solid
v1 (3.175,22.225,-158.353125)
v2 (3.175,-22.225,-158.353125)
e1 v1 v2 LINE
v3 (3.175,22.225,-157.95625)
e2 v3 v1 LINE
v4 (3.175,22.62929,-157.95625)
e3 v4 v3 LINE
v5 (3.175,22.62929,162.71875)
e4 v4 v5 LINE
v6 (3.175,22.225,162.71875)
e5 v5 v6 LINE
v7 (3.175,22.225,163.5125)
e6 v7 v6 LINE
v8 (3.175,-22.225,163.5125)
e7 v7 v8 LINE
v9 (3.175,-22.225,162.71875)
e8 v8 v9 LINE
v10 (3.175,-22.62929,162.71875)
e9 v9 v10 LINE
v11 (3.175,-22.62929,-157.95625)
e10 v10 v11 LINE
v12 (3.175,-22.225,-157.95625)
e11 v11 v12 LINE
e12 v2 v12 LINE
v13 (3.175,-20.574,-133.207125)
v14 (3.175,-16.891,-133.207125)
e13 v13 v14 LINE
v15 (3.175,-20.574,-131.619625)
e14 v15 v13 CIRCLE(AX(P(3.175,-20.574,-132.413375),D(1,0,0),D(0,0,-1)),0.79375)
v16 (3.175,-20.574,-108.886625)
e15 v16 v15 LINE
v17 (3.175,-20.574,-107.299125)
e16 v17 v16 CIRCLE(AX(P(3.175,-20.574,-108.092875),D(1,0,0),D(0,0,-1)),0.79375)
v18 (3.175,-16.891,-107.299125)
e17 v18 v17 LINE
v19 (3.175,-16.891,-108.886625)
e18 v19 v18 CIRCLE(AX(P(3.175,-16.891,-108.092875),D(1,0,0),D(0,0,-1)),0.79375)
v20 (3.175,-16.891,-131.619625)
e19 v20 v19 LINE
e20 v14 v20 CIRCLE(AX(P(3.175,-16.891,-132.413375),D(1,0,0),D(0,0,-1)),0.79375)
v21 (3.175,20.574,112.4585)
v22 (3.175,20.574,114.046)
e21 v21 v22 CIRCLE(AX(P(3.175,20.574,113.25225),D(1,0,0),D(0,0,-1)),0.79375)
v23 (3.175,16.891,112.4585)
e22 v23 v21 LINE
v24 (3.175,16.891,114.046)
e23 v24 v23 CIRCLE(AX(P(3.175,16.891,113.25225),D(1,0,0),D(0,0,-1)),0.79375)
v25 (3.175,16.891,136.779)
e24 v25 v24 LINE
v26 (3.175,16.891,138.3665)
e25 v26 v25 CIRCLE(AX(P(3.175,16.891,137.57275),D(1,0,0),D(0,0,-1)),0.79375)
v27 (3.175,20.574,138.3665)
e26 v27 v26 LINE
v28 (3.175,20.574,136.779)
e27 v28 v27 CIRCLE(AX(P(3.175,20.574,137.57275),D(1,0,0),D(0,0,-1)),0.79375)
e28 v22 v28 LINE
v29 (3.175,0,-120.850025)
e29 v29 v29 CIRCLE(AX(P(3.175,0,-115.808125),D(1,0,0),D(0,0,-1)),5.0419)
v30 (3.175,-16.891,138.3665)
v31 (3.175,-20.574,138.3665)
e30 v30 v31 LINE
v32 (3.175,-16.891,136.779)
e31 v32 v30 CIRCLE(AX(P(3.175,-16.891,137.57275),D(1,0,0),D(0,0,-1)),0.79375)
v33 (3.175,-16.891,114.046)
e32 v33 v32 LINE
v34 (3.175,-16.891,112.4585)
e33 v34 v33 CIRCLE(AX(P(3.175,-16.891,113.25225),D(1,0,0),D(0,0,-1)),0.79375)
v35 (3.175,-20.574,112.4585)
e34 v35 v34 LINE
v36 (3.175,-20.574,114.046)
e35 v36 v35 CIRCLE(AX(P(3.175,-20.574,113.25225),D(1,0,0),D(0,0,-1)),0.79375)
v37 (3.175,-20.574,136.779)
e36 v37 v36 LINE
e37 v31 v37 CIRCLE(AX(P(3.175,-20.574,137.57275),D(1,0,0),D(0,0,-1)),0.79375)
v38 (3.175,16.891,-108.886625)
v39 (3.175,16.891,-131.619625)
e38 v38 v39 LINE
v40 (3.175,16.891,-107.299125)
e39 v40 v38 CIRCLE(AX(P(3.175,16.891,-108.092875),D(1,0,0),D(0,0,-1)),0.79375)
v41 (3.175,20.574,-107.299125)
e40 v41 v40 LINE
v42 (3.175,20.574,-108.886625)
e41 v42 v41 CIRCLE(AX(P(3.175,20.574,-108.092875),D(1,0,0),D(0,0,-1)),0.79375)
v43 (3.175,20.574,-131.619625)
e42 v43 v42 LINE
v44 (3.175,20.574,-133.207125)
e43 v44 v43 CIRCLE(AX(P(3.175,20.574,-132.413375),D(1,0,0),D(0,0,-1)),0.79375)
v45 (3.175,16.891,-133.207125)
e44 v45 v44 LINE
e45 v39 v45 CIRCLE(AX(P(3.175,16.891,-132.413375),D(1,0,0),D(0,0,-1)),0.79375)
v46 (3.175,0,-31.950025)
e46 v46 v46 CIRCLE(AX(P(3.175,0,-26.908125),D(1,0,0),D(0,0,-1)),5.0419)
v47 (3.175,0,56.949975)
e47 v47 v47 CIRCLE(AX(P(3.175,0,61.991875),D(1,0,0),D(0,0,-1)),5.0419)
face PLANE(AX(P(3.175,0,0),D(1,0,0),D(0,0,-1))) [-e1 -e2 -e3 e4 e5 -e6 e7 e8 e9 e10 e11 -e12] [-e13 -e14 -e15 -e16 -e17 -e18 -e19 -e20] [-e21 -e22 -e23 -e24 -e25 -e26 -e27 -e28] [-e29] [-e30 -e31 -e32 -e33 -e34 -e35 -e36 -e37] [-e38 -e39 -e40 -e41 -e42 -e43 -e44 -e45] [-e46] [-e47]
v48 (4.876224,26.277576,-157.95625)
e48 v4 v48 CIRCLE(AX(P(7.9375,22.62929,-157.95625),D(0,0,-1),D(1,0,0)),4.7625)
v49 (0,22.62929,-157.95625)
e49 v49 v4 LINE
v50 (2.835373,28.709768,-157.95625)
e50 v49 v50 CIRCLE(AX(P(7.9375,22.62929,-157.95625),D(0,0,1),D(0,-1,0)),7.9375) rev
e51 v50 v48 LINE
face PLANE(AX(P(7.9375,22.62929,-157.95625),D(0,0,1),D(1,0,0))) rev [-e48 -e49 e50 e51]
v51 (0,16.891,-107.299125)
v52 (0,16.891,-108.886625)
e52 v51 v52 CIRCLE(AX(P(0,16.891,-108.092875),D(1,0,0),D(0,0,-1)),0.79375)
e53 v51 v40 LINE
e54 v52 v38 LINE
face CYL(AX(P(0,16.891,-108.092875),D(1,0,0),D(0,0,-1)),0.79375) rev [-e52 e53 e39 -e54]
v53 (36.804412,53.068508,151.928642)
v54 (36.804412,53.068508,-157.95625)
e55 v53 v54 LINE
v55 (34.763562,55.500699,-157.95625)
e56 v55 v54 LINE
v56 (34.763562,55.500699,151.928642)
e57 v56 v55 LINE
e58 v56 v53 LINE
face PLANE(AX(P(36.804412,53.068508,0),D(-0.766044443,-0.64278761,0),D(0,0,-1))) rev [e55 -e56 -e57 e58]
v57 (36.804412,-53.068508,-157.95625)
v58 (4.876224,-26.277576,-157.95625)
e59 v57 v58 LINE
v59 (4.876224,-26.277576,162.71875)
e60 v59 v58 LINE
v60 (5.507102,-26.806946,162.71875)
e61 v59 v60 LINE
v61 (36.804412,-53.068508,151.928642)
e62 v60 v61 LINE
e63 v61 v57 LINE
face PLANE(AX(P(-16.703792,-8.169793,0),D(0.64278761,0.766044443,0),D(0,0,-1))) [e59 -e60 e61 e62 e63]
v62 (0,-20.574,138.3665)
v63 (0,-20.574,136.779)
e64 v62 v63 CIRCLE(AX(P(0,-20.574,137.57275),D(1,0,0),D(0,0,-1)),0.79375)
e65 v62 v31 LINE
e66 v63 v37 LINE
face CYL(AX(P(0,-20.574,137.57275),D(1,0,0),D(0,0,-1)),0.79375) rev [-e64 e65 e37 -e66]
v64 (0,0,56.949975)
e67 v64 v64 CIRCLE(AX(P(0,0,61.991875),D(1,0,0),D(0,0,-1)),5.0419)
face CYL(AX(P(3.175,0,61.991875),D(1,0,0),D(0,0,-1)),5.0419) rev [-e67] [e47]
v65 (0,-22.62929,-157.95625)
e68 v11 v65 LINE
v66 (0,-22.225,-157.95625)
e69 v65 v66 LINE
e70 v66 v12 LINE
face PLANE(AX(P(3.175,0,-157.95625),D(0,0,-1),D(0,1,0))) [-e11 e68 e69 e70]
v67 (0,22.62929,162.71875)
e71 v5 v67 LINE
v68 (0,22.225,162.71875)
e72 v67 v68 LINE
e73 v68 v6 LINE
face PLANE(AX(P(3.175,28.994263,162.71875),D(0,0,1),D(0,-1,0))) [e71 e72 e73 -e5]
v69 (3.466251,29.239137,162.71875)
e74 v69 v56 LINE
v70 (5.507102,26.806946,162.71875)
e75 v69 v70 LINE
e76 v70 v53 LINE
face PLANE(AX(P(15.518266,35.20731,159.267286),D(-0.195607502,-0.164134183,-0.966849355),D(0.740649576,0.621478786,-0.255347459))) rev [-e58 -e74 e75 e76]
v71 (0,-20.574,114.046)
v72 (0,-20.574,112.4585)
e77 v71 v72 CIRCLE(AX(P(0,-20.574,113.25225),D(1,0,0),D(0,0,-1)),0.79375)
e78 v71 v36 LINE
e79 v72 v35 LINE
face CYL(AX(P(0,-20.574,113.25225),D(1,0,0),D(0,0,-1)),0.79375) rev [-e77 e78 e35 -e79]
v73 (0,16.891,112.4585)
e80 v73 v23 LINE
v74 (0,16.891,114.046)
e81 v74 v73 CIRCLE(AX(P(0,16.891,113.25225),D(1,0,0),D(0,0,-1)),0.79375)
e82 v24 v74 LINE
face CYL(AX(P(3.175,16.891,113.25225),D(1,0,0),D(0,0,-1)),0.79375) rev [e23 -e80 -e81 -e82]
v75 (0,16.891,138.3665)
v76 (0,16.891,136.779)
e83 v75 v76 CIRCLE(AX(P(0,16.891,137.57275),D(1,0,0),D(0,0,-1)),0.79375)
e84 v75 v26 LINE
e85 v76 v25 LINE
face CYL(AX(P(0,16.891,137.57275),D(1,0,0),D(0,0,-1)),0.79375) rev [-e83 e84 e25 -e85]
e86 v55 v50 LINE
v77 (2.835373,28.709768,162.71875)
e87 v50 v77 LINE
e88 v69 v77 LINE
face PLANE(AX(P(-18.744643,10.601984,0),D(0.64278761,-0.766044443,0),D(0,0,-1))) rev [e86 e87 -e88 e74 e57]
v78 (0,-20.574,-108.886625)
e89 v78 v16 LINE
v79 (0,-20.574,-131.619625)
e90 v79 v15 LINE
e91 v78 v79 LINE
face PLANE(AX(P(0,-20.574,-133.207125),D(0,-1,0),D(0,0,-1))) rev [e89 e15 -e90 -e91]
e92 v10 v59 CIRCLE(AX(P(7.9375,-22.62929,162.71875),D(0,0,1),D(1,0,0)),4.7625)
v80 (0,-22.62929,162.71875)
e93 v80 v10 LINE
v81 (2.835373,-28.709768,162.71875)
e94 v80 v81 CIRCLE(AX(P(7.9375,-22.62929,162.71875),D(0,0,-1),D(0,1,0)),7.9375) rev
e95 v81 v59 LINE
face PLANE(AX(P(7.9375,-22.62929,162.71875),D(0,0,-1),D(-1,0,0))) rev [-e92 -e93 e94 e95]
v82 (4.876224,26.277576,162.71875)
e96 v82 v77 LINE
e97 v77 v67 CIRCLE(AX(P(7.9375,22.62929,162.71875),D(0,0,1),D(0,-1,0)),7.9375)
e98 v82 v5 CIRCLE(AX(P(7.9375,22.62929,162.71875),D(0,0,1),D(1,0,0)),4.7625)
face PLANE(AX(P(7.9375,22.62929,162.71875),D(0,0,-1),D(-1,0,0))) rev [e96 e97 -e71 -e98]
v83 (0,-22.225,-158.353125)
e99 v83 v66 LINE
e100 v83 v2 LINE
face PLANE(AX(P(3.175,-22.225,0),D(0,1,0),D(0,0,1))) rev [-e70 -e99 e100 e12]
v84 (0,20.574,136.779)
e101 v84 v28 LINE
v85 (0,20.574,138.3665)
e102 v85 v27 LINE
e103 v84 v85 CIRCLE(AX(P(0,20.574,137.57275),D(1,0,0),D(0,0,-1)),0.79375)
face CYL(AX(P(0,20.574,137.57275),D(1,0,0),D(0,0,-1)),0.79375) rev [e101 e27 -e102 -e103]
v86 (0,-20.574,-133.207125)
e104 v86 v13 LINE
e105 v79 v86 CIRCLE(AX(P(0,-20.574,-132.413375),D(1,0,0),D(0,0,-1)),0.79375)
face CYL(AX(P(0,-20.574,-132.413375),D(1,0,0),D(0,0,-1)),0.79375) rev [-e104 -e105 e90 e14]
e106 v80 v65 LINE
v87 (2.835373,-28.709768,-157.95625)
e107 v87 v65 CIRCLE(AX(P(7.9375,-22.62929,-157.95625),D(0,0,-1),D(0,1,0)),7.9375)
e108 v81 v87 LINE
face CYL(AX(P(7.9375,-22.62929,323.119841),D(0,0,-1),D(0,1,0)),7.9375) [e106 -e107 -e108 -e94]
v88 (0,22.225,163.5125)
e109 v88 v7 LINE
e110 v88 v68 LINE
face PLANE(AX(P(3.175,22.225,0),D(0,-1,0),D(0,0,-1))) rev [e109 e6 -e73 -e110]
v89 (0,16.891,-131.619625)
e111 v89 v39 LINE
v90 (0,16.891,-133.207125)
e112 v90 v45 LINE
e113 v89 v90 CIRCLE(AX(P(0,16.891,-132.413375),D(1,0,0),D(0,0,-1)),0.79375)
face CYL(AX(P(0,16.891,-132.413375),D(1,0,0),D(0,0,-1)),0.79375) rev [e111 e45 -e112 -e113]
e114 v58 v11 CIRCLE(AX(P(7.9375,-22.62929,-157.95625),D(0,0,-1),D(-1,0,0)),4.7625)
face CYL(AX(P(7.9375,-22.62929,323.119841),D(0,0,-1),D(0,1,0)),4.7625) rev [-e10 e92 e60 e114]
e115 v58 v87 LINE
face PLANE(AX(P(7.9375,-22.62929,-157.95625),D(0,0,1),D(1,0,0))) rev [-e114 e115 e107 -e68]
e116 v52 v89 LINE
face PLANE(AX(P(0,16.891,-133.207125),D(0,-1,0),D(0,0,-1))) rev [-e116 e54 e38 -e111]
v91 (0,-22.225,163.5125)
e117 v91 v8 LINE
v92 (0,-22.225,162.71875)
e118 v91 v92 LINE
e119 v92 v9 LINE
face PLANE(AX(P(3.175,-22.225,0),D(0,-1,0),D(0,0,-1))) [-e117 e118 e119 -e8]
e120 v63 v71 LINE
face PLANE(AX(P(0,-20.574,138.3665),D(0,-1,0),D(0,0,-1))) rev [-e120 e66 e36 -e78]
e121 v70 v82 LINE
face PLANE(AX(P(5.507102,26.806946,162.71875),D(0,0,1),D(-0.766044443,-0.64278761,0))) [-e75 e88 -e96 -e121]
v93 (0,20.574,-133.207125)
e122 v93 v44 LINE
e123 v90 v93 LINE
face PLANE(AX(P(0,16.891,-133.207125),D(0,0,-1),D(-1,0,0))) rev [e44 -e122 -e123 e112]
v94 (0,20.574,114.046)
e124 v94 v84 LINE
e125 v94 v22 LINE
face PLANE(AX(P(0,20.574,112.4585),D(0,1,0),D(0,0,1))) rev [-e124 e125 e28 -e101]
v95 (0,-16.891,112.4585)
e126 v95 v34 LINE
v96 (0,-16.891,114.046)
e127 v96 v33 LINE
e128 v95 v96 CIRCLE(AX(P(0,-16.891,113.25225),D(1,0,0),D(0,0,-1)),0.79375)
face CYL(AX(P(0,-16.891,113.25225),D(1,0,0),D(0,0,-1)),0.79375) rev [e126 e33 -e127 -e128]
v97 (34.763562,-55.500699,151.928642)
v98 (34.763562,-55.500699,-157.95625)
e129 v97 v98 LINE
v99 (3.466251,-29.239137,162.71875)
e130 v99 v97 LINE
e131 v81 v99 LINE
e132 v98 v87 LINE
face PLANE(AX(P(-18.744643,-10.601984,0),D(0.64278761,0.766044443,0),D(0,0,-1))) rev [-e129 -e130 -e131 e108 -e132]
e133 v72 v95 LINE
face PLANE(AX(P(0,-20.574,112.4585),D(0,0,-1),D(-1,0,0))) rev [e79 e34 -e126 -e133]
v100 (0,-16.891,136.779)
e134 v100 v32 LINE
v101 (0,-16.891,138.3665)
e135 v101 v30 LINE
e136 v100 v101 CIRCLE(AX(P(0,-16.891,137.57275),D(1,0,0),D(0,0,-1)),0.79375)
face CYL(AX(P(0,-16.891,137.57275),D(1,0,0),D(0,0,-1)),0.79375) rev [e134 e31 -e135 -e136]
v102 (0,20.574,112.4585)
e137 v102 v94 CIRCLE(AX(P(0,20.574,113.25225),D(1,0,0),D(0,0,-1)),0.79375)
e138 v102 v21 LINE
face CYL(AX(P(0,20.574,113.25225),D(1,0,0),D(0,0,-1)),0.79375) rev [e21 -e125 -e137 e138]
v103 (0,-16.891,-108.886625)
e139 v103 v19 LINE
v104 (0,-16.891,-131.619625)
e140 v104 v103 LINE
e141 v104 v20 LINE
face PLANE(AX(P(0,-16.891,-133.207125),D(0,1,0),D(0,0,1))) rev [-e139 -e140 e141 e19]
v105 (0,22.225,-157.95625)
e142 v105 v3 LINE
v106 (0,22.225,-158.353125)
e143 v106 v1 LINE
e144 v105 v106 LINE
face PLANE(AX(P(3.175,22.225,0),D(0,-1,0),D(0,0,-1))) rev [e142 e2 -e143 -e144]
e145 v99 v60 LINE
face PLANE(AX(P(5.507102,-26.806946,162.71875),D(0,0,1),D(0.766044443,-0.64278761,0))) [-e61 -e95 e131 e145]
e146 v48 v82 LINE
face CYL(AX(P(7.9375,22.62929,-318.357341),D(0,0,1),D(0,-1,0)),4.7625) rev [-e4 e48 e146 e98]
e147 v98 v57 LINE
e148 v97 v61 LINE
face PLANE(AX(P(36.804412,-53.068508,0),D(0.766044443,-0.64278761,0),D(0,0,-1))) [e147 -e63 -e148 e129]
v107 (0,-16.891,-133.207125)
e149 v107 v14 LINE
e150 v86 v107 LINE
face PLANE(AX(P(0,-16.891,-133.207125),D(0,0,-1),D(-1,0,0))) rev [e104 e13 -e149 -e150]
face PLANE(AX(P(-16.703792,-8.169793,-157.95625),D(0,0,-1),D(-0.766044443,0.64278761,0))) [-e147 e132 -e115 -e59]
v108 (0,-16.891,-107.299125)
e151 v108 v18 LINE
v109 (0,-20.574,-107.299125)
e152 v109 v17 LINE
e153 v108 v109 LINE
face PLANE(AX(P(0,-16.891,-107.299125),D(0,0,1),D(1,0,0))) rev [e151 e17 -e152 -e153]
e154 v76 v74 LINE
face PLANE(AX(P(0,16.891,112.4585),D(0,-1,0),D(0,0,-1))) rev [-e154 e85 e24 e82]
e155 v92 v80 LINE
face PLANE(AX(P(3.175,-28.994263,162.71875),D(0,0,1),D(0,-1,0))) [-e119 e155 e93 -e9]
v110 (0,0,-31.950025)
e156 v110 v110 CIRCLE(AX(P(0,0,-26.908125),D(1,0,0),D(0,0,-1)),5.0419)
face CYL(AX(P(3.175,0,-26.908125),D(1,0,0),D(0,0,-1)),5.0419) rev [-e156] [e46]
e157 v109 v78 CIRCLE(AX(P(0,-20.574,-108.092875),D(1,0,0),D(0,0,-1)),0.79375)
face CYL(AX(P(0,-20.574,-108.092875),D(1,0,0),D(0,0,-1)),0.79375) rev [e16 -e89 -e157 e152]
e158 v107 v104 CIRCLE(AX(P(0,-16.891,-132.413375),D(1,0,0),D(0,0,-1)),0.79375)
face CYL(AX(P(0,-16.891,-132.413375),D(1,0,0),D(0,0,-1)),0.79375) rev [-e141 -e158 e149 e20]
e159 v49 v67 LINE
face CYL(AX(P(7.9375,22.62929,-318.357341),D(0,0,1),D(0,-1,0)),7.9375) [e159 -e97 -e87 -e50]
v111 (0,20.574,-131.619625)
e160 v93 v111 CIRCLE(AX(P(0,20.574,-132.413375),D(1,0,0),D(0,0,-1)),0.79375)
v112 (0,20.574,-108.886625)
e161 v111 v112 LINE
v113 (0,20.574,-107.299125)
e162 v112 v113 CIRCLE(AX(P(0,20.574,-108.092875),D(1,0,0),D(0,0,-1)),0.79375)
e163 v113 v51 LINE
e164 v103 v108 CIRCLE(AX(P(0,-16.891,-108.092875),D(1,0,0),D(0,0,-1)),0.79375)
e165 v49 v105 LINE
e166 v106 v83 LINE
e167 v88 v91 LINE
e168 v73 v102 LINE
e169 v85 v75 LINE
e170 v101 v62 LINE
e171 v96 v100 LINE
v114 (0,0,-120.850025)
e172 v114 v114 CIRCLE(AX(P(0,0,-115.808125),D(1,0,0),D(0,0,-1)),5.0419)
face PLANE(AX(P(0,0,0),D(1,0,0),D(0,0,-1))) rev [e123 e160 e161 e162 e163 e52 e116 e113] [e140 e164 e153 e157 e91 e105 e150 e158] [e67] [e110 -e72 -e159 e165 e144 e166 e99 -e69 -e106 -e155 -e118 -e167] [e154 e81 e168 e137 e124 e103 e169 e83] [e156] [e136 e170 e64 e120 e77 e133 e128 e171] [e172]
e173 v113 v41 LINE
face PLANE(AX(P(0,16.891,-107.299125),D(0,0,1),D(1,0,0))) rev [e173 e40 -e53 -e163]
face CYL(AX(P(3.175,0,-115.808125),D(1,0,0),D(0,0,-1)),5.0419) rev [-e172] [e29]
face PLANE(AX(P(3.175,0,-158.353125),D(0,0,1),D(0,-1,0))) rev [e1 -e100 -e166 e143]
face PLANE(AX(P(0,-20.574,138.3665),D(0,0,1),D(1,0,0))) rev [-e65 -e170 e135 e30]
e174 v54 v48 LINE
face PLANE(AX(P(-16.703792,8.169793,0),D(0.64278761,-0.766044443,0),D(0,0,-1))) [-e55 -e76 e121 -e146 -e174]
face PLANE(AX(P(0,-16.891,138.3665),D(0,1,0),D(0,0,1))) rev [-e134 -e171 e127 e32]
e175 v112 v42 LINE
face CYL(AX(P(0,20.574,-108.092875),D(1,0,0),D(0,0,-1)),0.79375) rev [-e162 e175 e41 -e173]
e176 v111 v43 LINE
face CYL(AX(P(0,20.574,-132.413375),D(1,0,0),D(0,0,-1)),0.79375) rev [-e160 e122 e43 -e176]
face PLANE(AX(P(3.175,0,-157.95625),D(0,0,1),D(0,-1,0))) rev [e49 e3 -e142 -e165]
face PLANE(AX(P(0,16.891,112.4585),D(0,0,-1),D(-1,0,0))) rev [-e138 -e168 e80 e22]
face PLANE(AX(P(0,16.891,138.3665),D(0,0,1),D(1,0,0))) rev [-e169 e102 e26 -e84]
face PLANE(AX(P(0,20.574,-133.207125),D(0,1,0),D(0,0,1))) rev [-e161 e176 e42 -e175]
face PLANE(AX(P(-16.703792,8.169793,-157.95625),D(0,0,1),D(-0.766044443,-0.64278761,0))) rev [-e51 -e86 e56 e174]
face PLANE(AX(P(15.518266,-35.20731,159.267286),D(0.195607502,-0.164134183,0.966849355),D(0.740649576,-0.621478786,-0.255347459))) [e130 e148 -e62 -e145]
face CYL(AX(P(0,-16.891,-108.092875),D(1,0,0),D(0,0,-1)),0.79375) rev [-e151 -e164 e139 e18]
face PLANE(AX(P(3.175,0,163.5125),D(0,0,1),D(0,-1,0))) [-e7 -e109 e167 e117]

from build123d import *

# Parameters (mm, degrees)
SKETCH1_W               = 1.984375
SKETCH1_H               = 44.45
SKETCH1_W_2             = 1.5875
SKETCH1_H_2             = 41.275
BOSS_EXTRUDE1_DEPTH     = 3.175
SKETCH11_W              = 1.5875
SKETCH11_H              = 6.769262927
SKETCH11_H_2            = 6.35
BOSS_EXTRUDE2_DEPTH     = 3.175
SKETCHED_START          = -157.95625
SKETCHED_BEND1_DEPTH    = 320.675
SKETCHED_BEND1_2_DEPTH  = 320.675
SKETCHED_START_2        = -28.869188599
SKETCHED_BEND1_3_DEPTH  = 34.81577629
F_3_8_CLEARANCE_HOLE1_D = 10.0838
SKETCH9_W               = 25.908
SKETCH9_H               = 3.683
SKETCH9_W_2             = 25.4
SKETCH9_H_2             = 3.175
CUT_EXTRUDE1_DEPTH      = 176.919307022
SKETCH10_R              = 0.79375
CUT_EXTRUDE2_DEPTH      = 176.919307022


with BuildPart() as part:
    # Sketch1 → Boss-Extrude1 (new body)
    with BuildSketch(Plane(origin=(0, 0, 0), x_dir=(0, 0, -1), z_dir=(1, 0, 0))):
        Polygon((-163.5125, 22.225), (-161.13125, 22.225), (-161.13125, 25.4), (-161.13125, 28.575), (-162.71875, 28.994262927), (-151.928642345, 69.85), (156.36875, 69.85), (156.36875, -69.85), (-151.928642345, -69.85), (-162.71875, -28.994262927), (-161.13125, -28.575), (-161.13125, -25.4), (-161.13125, -22.225), (-163.5125, -22.225), align=None)
        with Locations((157.3609375, 0)):
            Rectangle(SKETCH1_W, SKETCH1_H)
        with Locations((157.1625, -49.2125)):
            Rectangle(SKETCH1_W_2, SKETCH1_H_2)
        with Locations((157.1625, 49.2125)):
            Rectangle(SKETCH1_W_2, SKETCH1_H_2)
    extrude(amount=BOSS_EXTRUDE1_DEPTH)

    # Sketch11 → Boss-Extrude2 (add)
    with BuildSketch(Plane(origin=(3.175, 0, 0), x_dir=(0, 0, -1), z_dir=(1, 0, 0))):
        with Locations((-161.925, 25.609631464)):
            Rectangle(SKETCH11_W, SKETCH11_H)
        with Locations((-161.925, -25.609631464)):
            Rectangle(SKETCH11_W, SKETCH11_H)
        with Locations((157.1625, 25.4)):
            Rectangle(SKETCH11_W, SKETCH11_H_2)
        with Locations((157.1625, -25.4)):
            Rectangle(SKETCH11_W, SKETCH11_H_2)
    extrude(amount=-BOSS_EXTRUDE2_DEPTH)

    # Sketched Bend1: read off the stored shape, not the designer's step
    # Sketched Bend1 outline → Sketched Bend1 (cut)
    with BuildSketch(Plane.XY.offset(SKETCHED_START)):
        with BuildLine():
            Line((2.835373348, 28.70976758), (3.175, 28.994748178))
            Line((3.175, 28.994748178), (3.175, 69.85))
            Line((3.175, 69.85), (0, 69.85))
            Line((0, 69.85), (0, 22.629289812))
            ThreePointArc((0, 22.629289812), (0.74368194, 25.983822265), (2.835373348, 28.70976758))
        make_face()
        with BuildLine():
            Line((3.175, -69.85), (3.175, -28.994748178))
            Line((3.175, -28.994748178), (2.835373348, -28.70976758))
            ThreePointArc((2.835373348, -28.70976758), (0.74368194, -25.983822265), (0, -22.629289812))
            Line((0, -22.629289812), (0, -69.85))
            Line((0, -69.85), (3.175, -69.85))
        make_face()
    extrude(amount=SKETCHED_BEND1_DEPTH, mode=Mode.SUBTRACT)

    # Sketched Bend1 2 outline → Sketched Bend1 2 (add)
    with BuildSketch(Plane.XY.offset(SKETCHED_START)):
        with BuildLine():
            ThreePointArc((3.175, 22.629289812), (3.621209164, 24.642009284), (4.876224009, 26.277576473))
            Line((4.876224009, 26.277576473), (36.804412363, 53.068507545))
            Line((36.804412363, 53.068507545), (34.763561702, 55.500698652))
            Line((34.763561702, 55.500698652), (3.175, 28.994748178))
            Line((3.175, 28.994748178), (3.175, 22.629289812))
        make_face()
        with BuildLine():
            ThreePointArc((4.876224009, -26.277576473), (3.621209164, -24.642009284), (3.175, -22.629289812))
            Line((3.175, -22.629289812), (3.175, -28.994748178))
            Line((3.175, -28.994748178), (34.763561702, -55.500698652))
            Line((34.763561702, -55.500698652), (36.804412363, -53.068507545))
            Line((36.804412363, -53.068507545), (4.876224009, -26.277576473))
        make_face()
    extrude(amount=SKETCHED_BEND1_2_DEPTH)

    # Sketched Bend1 3 outline → Sketched Bend1 3 (cut)
    with BuildSketch(Plane(origin=(0, 0, 0), x_dir=(0, 1, 0), z_dir=(0.9801420201505087, 0, -0.19829679860068306)).offset(SKETCHED_START_2)):
        Polygon((0, 165.039953435), (26.80694597, 160.579525039), (55.500698652, 155.80514942), (57, 155.555679513), (57, 168), (17.789728089, 168), align=None)
        Polygon((-26.80694597, 160.579525039), (0, 165.039953435), (-17.789728089, 168), (-57, 168), (-57, 155.555679513), (-55.500698652, 155.80514942), align=None)
    extrude(amount=SKETCHED_BEND1_3_DEPTH, mode=Mode.SUBTRACT)

    # 3/8 Clearance Hole1 (through all)
    with Locations(Plane(origin=(3.175, 0, 0), x_dir=(0, 0, -1), z_dir=(1, 0, 0))):
        with Locations((115.808125, 0), (26.908125, 0), (-61.991875, 0)):
            Hole(F_3_8_CLEARANCE_HOLE1_D / 2)

    # Sketch9 → Cut-Extrude1 (cut, through all)
    # profile 1 of 4: a face of its own
    with BuildSketch(Plane(origin=(3.175, 0, 0), x_dir=(0, 0, -1), z_dir=(1, 0, 0))):
        with Locations((-125.4125, 18.7325)):
            Rectangle(SKETCH9_W, SKETCH9_H)
        with Locations((-125.4125, 18.7325)):
            Rectangle(SKETCH9_W_2, SKETCH9_H_2, mode=Mode.SUBTRACT)
    # profile 2 of 4: a face of its own
    with BuildSketch(Plane(origin=(3.175, 0, 0), x_dir=(0, 0, -1), z_dir=(1, 0, 0))):
        with Locations((-125.4125, -18.7325)):
            Rectangle(SKETCH9_W, SKETCH9_H)
        with Locations((-125.4125, -18.7325)):
            Rectangle(SKETCH9_W_2, SKETCH9_H_2, mode=Mode.SUBTRACT)
    # profile 3 of 4: a face of its own
    with BuildSketch(Plane(origin=(3.175, 0, 0), x_dir=(0, 0, -1), z_dir=(1, 0, 0))):
        with Locations((120.253125, 18.7325)):
            Rectangle(SKETCH9_W, SKETCH9_H)
        with Locations((120.253125, 18.7325)):
            Rectangle(SKETCH9_W_2, SKETCH9_H_2, mode=Mode.SUBTRACT)
    # profile 4 of 4: a face of its own
    with BuildSketch(Plane(origin=(3.175, 0, 0), x_dir=(0, 0, -1), z_dir=(1, 0, 0))):
        with Locations((120.253125, -18.7325)):
            Rectangle(SKETCH9_W, SKETCH9_H)
        with Locations((120.253125, -18.7325)):
            Rectangle(SKETCH9_W_2, SKETCH9_H_2, mode=Mode.SUBTRACT)
    extrude(amount=-CUT_EXTRUDE1_DEPTH, mode=Mode.SUBTRACT)


with BuildPart() as body_2:
    # of the pieces the cut leaves, the one that is kept (cut_extrude1_keep)
    add(part.part.solids().sort_by_distance((0, 22.225, 163.5125))[0])

    # Sketch10 → Cut-Extrude2 (cut, through all)
    with BuildSketch(Plane(origin=(3.175, 0, 0), x_dir=(0, 0, -1), z_dir=(1, 0, 0))):
        with Locations((108.092875, 16.891)):
            Circle(SKETCH10_R)
        with Locations((108.092875, 20.574)):
            Circle(SKETCH10_R)
        with Locations((132.413375, 20.574)):
            Circle(SKETCH10_R)
        with Locations((132.413375, 16.891)):
            Circle(SKETCH10_R)
        with Locations((132.413375, -16.891)):
            Circle(SKETCH10_R)
        with Locations((132.413375, -20.574)):
            Circle(SKETCH10_R)
        with Locations((108.092875, -20.574)):
            Circle(SKETCH10_R)
        with Locations((108.092875, -16.891)):
            Circle(SKETCH10_R)
        with Locations((-113.25225, -16.891)):
            Circle(SKETCH10_R)
        with Locations((-113.25225, -20.574)):
            Circle(SKETCH10_R)
        with Locations((-137.57275, -20.574)):
            Circle(SKETCH10_R)
        with Locations((-137.57275, -16.891)):
            Circle(SKETCH10_R)
        with Locations((-137.57275, 16.891)):
            Circle(SKETCH10_R)
        with Locations((-137.57275, 20.574)):
            Circle(SKETCH10_R)
        with Locations((-113.25225, 20.574)):
            Circle(SKETCH10_R)
        with Locations((-113.25225, 16.891)):
            Circle(SKETCH10_R)
    extrude(amount=-CUT_EXTRUDE2_DEPTH, mode=Mode.SUBTRACT)


solid = body_2.part
